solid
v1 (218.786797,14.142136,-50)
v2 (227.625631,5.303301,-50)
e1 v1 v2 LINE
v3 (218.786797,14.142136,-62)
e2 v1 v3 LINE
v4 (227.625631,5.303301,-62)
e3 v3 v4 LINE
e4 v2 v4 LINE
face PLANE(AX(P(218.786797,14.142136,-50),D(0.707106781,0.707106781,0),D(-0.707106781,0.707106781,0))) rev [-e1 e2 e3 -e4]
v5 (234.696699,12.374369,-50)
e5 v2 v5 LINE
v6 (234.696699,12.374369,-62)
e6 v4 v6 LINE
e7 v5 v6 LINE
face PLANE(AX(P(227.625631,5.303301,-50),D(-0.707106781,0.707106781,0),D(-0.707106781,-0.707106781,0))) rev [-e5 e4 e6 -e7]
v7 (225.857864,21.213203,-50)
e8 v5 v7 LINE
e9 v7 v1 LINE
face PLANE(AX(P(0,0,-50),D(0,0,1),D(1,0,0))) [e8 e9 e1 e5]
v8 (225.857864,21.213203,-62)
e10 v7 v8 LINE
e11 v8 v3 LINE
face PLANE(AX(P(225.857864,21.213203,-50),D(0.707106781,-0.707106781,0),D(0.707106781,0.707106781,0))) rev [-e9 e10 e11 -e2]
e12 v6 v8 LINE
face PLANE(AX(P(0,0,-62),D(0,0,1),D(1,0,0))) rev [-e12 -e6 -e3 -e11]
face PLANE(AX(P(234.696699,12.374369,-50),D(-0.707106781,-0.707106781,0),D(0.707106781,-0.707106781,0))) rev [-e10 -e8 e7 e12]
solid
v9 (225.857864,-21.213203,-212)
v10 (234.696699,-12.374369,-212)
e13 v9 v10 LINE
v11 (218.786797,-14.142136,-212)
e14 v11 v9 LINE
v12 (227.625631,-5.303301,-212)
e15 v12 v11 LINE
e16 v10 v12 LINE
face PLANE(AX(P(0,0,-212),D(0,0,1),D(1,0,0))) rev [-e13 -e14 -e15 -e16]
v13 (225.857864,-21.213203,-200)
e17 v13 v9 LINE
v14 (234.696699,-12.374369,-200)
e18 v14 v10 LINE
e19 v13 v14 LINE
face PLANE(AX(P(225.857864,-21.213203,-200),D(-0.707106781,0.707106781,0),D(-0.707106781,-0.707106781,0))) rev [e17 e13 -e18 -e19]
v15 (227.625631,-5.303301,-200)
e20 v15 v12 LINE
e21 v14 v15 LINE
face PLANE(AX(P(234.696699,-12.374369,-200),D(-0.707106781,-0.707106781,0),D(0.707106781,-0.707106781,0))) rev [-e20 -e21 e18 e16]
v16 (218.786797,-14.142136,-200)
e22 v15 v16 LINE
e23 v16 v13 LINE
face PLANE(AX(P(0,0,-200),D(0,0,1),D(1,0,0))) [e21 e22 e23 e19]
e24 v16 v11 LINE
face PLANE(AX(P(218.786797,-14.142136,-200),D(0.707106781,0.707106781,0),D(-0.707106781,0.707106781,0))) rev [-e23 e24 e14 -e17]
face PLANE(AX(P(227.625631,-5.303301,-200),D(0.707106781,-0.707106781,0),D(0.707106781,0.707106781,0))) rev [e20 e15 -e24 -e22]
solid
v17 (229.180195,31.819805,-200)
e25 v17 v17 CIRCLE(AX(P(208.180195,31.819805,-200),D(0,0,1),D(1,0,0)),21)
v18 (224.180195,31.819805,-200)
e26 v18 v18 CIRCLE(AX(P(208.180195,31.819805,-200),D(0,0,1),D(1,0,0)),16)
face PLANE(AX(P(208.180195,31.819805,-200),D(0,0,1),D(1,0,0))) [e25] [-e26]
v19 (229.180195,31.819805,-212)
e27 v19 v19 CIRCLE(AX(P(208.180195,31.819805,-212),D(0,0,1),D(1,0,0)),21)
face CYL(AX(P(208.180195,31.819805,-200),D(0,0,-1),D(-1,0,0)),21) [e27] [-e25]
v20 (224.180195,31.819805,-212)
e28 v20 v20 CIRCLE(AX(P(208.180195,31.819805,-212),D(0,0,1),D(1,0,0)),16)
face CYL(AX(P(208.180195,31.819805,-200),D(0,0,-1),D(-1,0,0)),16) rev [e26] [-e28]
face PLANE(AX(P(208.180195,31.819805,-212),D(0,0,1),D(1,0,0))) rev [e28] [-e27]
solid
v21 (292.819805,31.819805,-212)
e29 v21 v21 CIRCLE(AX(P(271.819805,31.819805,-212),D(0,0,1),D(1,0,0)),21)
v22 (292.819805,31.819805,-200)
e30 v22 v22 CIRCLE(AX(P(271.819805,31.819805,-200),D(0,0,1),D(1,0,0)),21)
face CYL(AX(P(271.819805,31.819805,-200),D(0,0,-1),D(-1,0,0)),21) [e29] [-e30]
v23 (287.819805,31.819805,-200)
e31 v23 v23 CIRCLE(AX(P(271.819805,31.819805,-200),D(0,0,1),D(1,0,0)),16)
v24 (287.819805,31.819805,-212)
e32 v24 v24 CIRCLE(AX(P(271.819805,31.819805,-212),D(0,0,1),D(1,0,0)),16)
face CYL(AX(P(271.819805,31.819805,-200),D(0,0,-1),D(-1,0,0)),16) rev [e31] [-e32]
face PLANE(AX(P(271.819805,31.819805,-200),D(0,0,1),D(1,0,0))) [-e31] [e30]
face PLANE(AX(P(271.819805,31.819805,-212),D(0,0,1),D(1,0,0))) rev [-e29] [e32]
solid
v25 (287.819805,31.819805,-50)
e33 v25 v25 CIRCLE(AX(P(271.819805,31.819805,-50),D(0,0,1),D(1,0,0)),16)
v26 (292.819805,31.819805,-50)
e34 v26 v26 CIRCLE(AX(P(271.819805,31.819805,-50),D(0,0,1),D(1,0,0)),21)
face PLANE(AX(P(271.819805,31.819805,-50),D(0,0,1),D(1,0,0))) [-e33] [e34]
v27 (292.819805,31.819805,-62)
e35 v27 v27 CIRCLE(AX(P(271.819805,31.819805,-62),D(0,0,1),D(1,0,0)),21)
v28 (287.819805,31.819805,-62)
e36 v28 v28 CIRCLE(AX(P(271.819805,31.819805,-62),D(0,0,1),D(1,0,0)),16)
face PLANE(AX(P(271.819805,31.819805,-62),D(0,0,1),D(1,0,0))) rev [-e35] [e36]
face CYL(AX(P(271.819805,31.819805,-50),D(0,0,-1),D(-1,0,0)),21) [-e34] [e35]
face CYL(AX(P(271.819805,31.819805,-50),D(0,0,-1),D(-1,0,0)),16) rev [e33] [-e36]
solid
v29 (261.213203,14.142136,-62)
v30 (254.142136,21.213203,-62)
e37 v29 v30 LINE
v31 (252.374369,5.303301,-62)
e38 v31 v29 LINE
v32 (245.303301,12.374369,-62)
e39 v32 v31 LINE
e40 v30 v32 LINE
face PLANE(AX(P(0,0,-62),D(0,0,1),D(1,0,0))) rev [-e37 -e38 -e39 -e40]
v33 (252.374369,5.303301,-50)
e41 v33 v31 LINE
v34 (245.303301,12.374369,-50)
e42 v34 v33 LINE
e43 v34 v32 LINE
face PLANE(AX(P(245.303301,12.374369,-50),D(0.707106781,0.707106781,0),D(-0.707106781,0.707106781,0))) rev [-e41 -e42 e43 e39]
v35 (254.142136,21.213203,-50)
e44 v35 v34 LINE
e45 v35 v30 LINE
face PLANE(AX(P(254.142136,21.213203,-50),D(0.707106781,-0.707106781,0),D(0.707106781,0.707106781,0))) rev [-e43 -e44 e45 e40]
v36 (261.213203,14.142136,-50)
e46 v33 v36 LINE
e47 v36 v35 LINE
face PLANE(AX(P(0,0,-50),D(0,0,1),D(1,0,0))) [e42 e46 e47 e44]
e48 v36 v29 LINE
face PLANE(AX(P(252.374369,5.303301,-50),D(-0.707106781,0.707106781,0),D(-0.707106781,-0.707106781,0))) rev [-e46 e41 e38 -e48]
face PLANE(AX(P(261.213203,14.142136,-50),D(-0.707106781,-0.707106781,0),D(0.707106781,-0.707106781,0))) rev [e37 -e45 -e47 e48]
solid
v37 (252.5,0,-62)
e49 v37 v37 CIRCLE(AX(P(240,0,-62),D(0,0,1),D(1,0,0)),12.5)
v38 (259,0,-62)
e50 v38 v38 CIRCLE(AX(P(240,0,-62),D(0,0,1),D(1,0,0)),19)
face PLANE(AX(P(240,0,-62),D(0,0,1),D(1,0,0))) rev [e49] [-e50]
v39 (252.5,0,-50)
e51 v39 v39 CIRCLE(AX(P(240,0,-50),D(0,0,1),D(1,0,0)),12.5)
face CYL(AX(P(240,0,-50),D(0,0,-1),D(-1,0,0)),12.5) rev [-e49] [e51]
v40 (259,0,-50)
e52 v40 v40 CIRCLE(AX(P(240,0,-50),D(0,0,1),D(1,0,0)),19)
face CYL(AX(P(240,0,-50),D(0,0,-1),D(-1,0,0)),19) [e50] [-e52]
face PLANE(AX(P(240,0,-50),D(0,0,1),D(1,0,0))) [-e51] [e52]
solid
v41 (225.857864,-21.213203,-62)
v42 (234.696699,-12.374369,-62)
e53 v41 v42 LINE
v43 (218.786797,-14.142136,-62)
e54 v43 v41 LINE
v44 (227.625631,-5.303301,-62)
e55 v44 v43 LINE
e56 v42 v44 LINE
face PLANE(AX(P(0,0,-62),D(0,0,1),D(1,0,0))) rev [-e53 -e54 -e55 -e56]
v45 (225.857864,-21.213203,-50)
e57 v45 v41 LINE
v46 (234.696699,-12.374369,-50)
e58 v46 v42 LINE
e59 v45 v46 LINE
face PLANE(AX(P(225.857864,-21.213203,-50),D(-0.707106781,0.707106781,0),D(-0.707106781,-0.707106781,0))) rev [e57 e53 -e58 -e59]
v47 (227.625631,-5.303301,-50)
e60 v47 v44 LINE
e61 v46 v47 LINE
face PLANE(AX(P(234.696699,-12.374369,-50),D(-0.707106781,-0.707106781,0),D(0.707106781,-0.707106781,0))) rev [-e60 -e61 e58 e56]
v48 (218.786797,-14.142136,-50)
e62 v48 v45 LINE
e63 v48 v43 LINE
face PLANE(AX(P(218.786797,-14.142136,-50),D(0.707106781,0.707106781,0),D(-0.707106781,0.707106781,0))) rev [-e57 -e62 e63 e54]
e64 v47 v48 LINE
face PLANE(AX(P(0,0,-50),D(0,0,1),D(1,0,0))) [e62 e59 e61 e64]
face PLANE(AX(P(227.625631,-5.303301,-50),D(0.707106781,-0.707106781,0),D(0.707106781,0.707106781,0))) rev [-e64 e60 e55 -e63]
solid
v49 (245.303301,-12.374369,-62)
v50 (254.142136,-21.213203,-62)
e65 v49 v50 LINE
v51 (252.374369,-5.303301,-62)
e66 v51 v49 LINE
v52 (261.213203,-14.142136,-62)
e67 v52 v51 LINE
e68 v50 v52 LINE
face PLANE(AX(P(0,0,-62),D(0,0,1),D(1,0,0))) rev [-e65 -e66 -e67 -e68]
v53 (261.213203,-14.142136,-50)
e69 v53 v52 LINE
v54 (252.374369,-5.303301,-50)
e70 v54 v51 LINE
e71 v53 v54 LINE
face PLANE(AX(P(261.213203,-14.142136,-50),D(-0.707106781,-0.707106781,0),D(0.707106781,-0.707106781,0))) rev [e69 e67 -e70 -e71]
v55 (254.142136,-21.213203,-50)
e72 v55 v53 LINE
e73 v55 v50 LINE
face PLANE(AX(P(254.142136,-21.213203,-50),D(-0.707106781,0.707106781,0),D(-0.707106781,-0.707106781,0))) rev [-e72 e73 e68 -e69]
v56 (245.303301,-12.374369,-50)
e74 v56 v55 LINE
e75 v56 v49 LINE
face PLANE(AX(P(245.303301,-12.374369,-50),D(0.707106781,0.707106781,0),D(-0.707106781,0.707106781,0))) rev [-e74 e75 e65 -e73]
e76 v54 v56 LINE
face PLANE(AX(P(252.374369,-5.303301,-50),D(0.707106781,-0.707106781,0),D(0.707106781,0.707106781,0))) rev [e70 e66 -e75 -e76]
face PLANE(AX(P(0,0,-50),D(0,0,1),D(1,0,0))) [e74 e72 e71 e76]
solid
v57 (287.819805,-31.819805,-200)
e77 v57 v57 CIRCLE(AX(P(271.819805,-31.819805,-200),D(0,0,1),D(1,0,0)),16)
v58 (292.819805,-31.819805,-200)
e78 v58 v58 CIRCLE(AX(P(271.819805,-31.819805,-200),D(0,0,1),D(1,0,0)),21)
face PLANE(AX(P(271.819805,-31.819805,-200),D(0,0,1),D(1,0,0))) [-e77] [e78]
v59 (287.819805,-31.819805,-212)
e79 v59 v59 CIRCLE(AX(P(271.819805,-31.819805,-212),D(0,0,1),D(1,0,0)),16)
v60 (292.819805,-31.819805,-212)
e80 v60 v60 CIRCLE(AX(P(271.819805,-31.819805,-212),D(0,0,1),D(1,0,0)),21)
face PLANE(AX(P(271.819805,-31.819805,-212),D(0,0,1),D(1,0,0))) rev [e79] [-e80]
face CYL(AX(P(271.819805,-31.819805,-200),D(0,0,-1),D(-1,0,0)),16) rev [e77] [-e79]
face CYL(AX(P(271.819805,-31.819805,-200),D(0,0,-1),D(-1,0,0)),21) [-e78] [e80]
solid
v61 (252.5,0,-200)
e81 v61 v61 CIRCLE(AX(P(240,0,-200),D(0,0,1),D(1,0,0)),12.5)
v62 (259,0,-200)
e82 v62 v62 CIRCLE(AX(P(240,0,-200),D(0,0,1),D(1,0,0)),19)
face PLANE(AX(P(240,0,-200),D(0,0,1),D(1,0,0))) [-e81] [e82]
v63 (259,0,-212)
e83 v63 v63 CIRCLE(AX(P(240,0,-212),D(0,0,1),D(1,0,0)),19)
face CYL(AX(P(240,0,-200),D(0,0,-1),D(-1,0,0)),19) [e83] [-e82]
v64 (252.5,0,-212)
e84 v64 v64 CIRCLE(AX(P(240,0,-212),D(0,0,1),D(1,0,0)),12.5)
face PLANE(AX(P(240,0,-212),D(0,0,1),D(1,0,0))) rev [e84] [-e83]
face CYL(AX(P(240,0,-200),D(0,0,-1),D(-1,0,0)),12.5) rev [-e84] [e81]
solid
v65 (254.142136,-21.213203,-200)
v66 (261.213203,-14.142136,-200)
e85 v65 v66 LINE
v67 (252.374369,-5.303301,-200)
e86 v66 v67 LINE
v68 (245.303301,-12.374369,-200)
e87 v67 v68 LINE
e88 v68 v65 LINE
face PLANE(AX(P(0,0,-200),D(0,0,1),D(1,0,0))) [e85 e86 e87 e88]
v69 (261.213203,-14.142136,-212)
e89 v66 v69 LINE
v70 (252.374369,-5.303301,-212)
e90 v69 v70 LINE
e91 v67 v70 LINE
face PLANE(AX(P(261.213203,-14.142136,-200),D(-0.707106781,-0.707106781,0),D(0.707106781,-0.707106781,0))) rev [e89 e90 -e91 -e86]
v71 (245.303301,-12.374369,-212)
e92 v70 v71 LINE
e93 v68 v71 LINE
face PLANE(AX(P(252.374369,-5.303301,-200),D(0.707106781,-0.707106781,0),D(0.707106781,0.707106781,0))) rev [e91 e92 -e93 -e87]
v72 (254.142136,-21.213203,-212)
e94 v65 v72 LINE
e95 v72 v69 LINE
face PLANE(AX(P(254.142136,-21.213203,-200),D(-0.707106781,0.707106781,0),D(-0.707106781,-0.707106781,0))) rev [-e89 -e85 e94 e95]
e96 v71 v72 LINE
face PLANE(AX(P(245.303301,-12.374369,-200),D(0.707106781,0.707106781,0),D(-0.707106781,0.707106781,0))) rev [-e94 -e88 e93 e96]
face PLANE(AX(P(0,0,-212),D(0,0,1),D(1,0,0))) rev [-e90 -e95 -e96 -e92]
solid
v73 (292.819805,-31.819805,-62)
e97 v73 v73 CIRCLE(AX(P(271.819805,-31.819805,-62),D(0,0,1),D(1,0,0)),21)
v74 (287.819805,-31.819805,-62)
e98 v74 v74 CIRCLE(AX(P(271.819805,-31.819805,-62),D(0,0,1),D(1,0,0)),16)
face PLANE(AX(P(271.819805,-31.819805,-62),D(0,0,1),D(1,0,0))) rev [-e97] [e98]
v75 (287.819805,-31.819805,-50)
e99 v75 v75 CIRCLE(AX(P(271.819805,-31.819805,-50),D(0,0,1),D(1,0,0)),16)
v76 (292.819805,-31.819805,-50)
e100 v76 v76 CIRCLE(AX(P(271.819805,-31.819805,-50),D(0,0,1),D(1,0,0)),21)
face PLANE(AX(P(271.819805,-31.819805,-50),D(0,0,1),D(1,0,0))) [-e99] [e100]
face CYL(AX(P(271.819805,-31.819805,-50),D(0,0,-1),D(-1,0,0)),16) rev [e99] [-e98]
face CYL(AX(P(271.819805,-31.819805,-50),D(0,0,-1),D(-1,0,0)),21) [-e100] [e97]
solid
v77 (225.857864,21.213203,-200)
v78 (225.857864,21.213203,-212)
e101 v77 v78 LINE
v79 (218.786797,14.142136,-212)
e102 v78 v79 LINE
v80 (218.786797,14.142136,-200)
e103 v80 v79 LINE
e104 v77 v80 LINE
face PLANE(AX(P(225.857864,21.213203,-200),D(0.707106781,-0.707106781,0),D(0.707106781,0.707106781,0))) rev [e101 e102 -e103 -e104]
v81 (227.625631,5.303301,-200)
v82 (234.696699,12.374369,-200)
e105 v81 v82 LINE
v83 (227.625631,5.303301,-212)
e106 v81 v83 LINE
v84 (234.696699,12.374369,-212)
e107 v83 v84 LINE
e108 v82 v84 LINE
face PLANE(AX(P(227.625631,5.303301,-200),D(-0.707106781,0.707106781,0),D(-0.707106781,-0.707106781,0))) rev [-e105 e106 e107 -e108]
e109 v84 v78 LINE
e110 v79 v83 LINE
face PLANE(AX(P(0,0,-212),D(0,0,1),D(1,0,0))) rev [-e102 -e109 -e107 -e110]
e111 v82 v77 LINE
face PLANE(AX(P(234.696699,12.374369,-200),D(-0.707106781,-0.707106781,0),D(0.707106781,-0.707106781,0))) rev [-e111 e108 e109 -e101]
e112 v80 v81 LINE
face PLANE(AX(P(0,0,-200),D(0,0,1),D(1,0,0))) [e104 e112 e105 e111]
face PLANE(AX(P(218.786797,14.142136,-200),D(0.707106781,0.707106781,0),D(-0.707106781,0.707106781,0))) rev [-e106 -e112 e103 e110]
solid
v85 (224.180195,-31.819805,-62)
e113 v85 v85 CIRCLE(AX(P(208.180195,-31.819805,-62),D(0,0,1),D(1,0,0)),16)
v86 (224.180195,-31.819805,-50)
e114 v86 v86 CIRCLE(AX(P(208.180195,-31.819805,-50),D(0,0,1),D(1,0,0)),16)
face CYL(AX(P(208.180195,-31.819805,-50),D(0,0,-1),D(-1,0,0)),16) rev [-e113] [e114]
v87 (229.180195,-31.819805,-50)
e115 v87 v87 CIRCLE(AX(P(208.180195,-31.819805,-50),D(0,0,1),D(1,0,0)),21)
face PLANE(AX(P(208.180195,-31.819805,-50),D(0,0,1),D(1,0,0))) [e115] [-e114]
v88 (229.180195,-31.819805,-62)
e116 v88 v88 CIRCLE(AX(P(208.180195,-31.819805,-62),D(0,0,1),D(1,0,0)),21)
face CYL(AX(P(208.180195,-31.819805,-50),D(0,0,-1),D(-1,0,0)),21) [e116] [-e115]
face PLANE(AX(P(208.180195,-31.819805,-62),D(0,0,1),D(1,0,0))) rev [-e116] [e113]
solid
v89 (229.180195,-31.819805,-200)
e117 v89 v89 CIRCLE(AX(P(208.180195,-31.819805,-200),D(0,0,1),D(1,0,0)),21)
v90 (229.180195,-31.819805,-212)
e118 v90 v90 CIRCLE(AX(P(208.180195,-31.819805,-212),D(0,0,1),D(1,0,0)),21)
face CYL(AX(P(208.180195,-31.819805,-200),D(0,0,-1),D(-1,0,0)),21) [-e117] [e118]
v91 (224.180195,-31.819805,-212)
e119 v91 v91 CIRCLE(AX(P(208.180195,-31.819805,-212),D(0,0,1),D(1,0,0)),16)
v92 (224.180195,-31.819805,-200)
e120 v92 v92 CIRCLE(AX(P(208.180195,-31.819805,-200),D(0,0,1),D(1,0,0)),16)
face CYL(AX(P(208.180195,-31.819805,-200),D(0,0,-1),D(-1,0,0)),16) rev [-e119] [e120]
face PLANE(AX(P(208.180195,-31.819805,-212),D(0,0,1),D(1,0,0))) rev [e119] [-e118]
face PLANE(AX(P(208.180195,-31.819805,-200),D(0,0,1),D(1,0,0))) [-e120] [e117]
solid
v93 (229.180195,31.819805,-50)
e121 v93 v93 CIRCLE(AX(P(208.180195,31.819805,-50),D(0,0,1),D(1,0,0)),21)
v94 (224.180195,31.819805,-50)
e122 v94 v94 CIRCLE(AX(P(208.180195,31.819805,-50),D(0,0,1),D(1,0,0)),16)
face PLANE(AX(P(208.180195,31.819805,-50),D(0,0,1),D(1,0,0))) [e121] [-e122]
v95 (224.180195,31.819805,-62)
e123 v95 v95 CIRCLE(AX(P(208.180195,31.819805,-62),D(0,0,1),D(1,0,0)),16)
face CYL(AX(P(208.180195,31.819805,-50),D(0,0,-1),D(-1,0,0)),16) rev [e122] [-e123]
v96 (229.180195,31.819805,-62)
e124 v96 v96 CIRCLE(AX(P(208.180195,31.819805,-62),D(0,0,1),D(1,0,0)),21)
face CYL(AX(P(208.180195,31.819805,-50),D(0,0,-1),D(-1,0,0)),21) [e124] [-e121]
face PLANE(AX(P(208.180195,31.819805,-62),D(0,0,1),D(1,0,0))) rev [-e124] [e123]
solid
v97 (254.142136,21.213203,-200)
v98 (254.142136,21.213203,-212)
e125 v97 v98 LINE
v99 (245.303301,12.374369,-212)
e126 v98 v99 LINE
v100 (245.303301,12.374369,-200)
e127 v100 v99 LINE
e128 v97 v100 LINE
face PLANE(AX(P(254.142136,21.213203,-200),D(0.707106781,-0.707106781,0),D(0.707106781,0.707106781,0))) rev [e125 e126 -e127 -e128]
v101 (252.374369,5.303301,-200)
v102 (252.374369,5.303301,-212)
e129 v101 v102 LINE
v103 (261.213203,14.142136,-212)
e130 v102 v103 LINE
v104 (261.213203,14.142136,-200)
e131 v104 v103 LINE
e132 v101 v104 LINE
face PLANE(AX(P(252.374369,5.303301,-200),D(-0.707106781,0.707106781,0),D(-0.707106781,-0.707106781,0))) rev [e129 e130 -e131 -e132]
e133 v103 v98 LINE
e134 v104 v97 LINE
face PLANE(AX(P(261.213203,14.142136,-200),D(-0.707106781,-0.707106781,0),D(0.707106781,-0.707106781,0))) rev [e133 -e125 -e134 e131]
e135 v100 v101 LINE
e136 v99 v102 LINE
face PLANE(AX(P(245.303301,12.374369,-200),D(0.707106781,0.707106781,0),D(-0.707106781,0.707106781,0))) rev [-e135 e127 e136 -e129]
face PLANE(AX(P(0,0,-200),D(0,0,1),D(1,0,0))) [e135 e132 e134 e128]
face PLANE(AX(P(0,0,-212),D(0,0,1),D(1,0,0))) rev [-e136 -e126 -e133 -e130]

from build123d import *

# Parameters (mm, degrees)
EXTRUDE_START         = -62
EXTRUDE_SKETCH_1_R    = 21
EXTRUDE_SKETCH_1_R_2  = 16
EXTRUDE_1_DEPTH       = 12
EXTRUDE_2_DEPTH       = 12
EXTRUDE_SKETCH_3_R    = 21
EXTRUDE_SKETCH_3_R_2  = 16
EXTRUDE_3_DEPTH       = 12
EXTRUDE_4_DEPTH       = 12
EXTRUDE_SKETCH_5_R    = 21
EXTRUDE_SKETCH_5_R_2  = 16
EXTRUDE_5_DEPTH       = 12
EXTRUDE_6_DEPTH       = 12
EXTRUDE_SKETCH_7_R    = 21
EXTRUDE_SKETCH_7_R_2  = 16
EXTRUDE_7_DEPTH       = 12
EXTRUDE_8_DEPTH       = 12
EXTRUDE_SKETCH_9_R    = 19
EXTRUDE_SKETCH_9_R_2  = 12.5
EXTRUDE_9_DEPTH       = 12
EXTRUDE_START_2       = -212
EXTRUDE_SKETCH_10_R   = 21
EXTRUDE_SKETCH_10_R_2 = 16
EXTRUDE_10_DEPTH      = 12
EXTRUDE_11_DEPTH      = 12
EXTRUDE_SKETCH_12_R   = 21
EXTRUDE_SKETCH_12_R_2 = 16
EXTRUDE_12_DEPTH      = 12
EXTRUDE_13_DEPTH      = 12
EXTRUDE_SKETCH_14_R   = 21
EXTRUDE_SKETCH_14_R_2 = 16
EXTRUDE_14_DEPTH      = 12
EXTRUDE_15_DEPTH      = 12
EXTRUDE_SKETCH_16_R   = 21
EXTRUDE_SKETCH_16_R_2 = 16
EXTRUDE_16_DEPTH      = 12
EXTRUDE_17_DEPTH      = 12
EXTRUDE_SKETCH_18_R   = 19
EXTRUDE_SKETCH_18_R_2 = 12.5
EXTRUDE_18_DEPTH      = 12


with BuildPart() as part:
    # Extrude sketch 1 → Extrude 1 (new body)
    with BuildSketch(Plane.XY.offset(EXTRUDE_START)):
        with Locations((271.819805153, 31.819805153)):
            Circle(EXTRUDE_SKETCH_1_R)
        with Locations((271.819805153, 31.819805153)):
            Circle(EXTRUDE_SKETCH_1_R_2, mode=Mode.SUBTRACT)
    extrude(amount=EXTRUDE_1_DEPTH)


with BuildPart() as body_2:
    # Extrude sketch 2 → Extrude 2 (new body)
    with BuildSketch(Plane.XY.offset(EXTRUDE_START)):
        Polygon((252.374368671, 5.303300859), (261.213203436, 14.142135624), (254.142135624, 21.213203436), (245.303300859, 12.374368671), align=None)
    extrude(amount=EXTRUDE_2_DEPTH)


with BuildPart() as body_3:
    # Extrude sketch 3 → Extrude 3 (new body)
    with BuildSketch(Plane.XY.offset(EXTRUDE_START)):
        with Locations((208.180194847, 31.819805153)):
            Circle(EXTRUDE_SKETCH_3_R)
        with Locations((208.180194847, 31.819805153)):
            Circle(EXTRUDE_SKETCH_3_R_2, mode=Mode.SUBTRACT)
    extrude(amount=EXTRUDE_3_DEPTH)


with BuildPart() as body_4:
    # Extrude sketch 4 → Extrude 4 (new body)
    with BuildSketch(Plane.XY.offset(EXTRUDE_START)):
        Polygon((234.696699141, 12.374368671), (225.857864376, 21.213203436), (218.786796564, 14.142135624), (227.625631329, 5.303300859), align=None)
    extrude(amount=EXTRUDE_4_DEPTH)


with BuildPart() as body_5:
    # Extrude sketch 5 → Extrude 5 (new body)
    with BuildSketch(Plane.XY.offset(EXTRUDE_START)):
        with Locations((208.180194847, -31.819805153)):
            Circle(EXTRUDE_SKETCH_5_R)
        with Locations((208.180194847, -31.819805153)):
            Circle(EXTRUDE_SKETCH_5_R_2, mode=Mode.SUBTRACT)
    extrude(amount=EXTRUDE_5_DEPTH)


with BuildPart() as body_6:
    # Extrude sketch 6 → Extrude 6 (new body)
    with BuildSketch(Plane.XY.offset(EXTRUDE_START)):
        Polygon((227.625631329, -5.303300859), (218.786796564, -14.142135624), (225.857864376, -21.213203436), (234.696699141, -12.374368671), align=None)
    extrude(amount=EXTRUDE_6_DEPTH)


with BuildPart() as body_7:
    # Extrude sketch 7 → Extrude 7 (new body)
    with BuildSketch(Plane.XY.offset(EXTRUDE_START)):
        with Locations((271.819805153, -31.819805153)):
            Circle(EXTRUDE_SKETCH_7_R)
        with Locations((271.819805153, -31.819805153)):
            Circle(EXTRUDE_SKETCH_7_R_2, mode=Mode.SUBTRACT)
    extrude(amount=EXTRUDE_7_DEPTH)


with BuildPart() as body_8:
    # Extrude sketch 8 → Extrude 8 (new body)
    with BuildSketch(Plane.XY.offset(EXTRUDE_START)):
        Polygon((245.303300859, -12.374368671), (254.142135624, -21.213203436), (261.213203436, -14.142135624), (252.374368671, -5.303300859), align=None)
    extrude(amount=EXTRUDE_8_DEPTH)


with BuildPart() as body_9:
    # Extrude sketch 9 → Extrude 9 (new body)
    with BuildSketch(Plane.XY.offset(EXTRUDE_START)):
        with Locations((240, 0)):
            Circle(EXTRUDE_SKETCH_9_R)
        with Locations((240, 0)):
            Circle(EXTRUDE_SKETCH_9_R_2, mode=Mode.SUBTRACT)
    extrude(amount=EXTRUDE_9_DEPTH)


with BuildPart() as body_10:
    # Extrude sketch 10 → Extrude 10 (new body)
    with BuildSketch(Plane.XY.offset(EXTRUDE_START_2)):
        with Locations((271.819805153, 31.819805153)):
            Circle(EXTRUDE_SKETCH_10_R)
        with Locations((271.819805153, 31.819805153)):
            Circle(EXTRUDE_SKETCH_10_R_2, mode=Mode.SUBTRACT)
    extrude(amount=EXTRUDE_10_DEPTH)


with BuildPart() as body_11:
    # Extrude sketch 11 → Extrude 11 (new body)
    with BuildSketch(Plane.XY.offset(EXTRUDE_START_2)):
        Polygon((252.374368671, 5.303300859), (261.213203436, 14.142135624), (254.142135624, 21.213203436), (245.303300859, 12.374368671), align=None)
    extrude(amount=EXTRUDE_11_DEPTH)


with BuildPart() as body_12:
    # Extrude sketch 12 → Extrude 12 (new body)
    with BuildSketch(Plane.XY.offset(EXTRUDE_START_2)):
        with Locations((208.180194847, 31.819805153)):
            Circle(EXTRUDE_SKETCH_12_R)
        with Locations((208.180194847, 31.819805153)):
            Circle(EXTRUDE_SKETCH_12_R_2, mode=Mode.SUBTRACT)
    extrude(amount=EXTRUDE_12_DEPTH)


with BuildPart() as body_13:
    # Extrude sketch 13 → Extrude 13 (new body)
    with BuildSketch(Plane.XY.offset(EXTRUDE_START_2)):
        Polygon((234.696699141, 12.374368671), (225.857864376, 21.213203436), (218.786796564, 14.142135624), (227.625631329, 5.303300859), align=None)
    extrude(amount=EXTRUDE_13_DEPTH)


with BuildPart() as body_14:
    # Extrude sketch 14 → Extrude 14 (new body)
    with BuildSketch(Plane.XY.offset(EXTRUDE_START_2)):
        with Locations((208.180194847, -31.819805153)):
            Circle(EXTRUDE_SKETCH_14_R)
        with Locations((208.180194847, -31.819805153)):
            Circle(EXTRUDE_SKETCH_14_R_2, mode=Mode.SUBTRACT)
    extrude(amount=EXTRUDE_14_DEPTH)


with BuildPart() as body_15:
    # Extrude sketch 15 → Extrude 15 (new body)
    with BuildSketch(Plane.XY.offset(EXTRUDE_START_2)):
        Polygon((227.625631329, -5.303300859), (218.786796564, -14.142135624), (225.857864376, -21.213203436), (234.696699141, -12.374368671), align=None)
    extrude(amount=EXTRUDE_15_DEPTH)


with BuildPart() as body_16:
    # Extrude sketch 16 → Extrude 16 (new body)
    with BuildSketch(Plane.XY.offset(EXTRUDE_START_2)):
        with Locations((271.819805153, -31.819805153)):
            Circle(EXTRUDE_SKETCH_16_R)
        with Locations((271.819805153, -31.819805153)):
            Circle(EXTRUDE_SKETCH_16_R_2, mode=Mode.SUBTRACT)
    extrude(amount=EXTRUDE_16_DEPTH)


with BuildPart() as body_17:
    # Extrude sketch 17 → Extrude 17 (new body)
    with BuildSketch(Plane.XY.offset(EXTRUDE_START_2)):
        Polygon((245.303300859, -12.374368671), (254.142135624, -21.213203436), (261.213203436, -14.142135624), (252.374368671, -5.303300859), align=None)
    extrude(amount=EXTRUDE_17_DEPTH)


with BuildPart() as body_18:
    # Extrude sketch 18 → Extrude 18 (new body)
    with BuildSketch(Plane.XY.offset(EXTRUDE_START_2)):
        with Locations((240, 0)):
            Circle(EXTRUDE_SKETCH_18_R)
        with Locations((240, 0)):
            Circle(EXTRUDE_SKETCH_18_R_2, mode=Mode.SUBTRACT)
    extrude(amount=EXTRUDE_18_DEPTH)


solid = Compound([part.part, body_2.part, body_3.part, body_4.part, body_5.part, body_6.part, body_7.part, body_8.part, body_9.part, body_10.part, body_11.part, body_12.part, body_13.part, body_14.part, body_15.part, body_16.part, body_17.part, body_18.part])
